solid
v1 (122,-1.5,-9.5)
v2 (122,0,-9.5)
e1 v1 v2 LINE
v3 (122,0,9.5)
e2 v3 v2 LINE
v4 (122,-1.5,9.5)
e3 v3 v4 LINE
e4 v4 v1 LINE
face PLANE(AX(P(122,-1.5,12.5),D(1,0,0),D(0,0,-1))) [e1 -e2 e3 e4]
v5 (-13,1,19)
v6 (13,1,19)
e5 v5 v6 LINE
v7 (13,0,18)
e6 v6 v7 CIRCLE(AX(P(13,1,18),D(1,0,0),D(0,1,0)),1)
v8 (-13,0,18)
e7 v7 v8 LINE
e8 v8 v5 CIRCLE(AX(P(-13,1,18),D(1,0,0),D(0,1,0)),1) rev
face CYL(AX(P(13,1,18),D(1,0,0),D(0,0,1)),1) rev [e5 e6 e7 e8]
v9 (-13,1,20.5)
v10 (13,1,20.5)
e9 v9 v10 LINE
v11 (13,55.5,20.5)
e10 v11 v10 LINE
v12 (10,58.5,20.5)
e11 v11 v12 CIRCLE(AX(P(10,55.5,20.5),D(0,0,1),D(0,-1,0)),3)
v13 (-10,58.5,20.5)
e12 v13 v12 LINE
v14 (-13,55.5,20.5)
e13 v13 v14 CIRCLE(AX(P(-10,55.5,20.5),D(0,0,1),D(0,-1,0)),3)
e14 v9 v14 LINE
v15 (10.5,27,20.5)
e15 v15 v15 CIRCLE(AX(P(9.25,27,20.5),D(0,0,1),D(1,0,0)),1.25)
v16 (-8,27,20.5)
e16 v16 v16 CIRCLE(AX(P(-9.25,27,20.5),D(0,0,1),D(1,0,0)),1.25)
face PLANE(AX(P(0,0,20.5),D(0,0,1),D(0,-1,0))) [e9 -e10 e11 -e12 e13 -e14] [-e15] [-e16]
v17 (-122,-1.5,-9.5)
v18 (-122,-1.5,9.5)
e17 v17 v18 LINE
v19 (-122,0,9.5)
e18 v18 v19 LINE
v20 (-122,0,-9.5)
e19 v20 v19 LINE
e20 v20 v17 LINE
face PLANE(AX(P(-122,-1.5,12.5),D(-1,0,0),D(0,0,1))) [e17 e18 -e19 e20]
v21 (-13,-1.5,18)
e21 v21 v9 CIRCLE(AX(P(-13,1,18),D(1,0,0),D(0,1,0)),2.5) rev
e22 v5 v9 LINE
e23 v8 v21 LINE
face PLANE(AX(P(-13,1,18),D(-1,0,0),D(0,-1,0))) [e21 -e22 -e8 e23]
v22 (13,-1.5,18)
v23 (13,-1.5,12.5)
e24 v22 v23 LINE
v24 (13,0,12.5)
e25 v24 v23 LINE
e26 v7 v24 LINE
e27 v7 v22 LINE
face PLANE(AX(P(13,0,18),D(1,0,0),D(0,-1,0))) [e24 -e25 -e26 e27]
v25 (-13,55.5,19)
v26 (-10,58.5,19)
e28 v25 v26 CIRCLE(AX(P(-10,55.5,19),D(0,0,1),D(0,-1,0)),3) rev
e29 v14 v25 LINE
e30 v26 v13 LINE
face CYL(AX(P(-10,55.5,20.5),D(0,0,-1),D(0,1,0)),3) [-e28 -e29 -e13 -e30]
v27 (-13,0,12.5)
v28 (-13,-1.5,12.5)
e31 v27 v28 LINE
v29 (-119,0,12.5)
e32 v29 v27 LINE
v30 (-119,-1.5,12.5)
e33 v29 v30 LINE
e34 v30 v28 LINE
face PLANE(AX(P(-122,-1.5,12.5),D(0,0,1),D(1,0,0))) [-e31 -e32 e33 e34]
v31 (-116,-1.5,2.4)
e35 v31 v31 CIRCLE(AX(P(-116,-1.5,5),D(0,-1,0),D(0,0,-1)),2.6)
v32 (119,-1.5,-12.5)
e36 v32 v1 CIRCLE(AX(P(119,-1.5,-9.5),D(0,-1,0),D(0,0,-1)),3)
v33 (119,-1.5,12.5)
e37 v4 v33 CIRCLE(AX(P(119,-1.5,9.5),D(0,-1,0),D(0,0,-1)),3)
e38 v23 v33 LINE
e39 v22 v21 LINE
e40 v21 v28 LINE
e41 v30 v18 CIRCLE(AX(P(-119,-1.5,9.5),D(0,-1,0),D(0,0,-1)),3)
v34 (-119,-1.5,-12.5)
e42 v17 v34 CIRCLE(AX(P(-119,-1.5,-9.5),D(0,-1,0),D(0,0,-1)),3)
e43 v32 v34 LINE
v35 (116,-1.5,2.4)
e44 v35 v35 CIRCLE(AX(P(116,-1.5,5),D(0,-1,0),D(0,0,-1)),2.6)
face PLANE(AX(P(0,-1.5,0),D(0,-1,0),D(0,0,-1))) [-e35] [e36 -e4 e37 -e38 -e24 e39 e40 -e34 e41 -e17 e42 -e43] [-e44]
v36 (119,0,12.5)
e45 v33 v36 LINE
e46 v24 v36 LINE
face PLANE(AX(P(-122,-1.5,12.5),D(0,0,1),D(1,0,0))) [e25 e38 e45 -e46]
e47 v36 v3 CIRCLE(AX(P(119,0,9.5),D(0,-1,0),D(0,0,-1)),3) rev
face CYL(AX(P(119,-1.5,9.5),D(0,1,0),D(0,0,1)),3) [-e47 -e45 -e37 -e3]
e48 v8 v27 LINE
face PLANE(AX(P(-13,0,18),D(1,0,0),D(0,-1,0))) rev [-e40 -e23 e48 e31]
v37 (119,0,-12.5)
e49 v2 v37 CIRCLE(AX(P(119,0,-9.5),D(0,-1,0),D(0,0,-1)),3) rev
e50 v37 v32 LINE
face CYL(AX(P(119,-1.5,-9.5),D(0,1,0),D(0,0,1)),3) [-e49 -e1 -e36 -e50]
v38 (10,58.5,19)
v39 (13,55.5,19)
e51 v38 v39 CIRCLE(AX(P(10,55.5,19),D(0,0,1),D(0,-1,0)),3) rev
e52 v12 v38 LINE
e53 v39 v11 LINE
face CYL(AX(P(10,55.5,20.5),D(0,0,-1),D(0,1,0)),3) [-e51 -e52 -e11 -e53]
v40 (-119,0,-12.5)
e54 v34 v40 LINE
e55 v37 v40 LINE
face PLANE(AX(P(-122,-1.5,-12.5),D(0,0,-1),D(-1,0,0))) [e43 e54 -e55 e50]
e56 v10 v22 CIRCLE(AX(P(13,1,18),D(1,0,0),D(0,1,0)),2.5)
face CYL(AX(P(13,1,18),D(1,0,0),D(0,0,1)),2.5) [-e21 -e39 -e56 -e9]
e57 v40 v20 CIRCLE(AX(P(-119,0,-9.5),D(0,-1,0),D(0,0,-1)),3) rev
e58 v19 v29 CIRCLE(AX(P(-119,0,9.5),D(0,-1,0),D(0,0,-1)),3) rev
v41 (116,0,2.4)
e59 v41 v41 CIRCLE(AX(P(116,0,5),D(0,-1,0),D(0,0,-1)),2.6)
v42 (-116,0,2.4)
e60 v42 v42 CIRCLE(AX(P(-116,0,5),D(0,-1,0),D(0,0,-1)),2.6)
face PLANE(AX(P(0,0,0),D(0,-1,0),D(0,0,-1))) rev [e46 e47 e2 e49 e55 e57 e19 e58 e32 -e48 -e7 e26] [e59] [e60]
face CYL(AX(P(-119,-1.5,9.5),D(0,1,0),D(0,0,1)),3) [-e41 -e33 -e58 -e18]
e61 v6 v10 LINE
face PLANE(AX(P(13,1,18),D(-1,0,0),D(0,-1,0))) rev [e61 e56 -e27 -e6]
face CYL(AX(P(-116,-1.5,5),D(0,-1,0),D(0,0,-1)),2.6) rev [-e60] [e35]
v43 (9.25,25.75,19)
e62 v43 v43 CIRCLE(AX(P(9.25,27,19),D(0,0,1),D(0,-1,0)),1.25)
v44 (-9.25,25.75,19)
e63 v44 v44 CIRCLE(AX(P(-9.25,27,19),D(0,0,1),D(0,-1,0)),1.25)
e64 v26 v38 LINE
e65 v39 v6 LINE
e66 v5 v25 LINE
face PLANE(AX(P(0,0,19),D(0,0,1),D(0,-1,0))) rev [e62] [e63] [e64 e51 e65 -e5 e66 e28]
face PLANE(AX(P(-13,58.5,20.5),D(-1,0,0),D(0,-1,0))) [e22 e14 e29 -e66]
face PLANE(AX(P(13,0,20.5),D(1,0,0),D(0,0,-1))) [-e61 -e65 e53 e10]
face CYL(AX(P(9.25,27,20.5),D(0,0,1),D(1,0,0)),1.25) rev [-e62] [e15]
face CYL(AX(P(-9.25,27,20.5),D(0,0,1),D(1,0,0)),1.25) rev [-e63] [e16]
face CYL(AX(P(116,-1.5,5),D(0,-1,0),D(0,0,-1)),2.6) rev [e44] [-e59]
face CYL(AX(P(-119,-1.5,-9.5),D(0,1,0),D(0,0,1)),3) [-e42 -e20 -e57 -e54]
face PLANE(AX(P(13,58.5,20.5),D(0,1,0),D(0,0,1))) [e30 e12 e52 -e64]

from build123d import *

# Parameters (mm, degrees)
SKETCH_2_W              = 244
SKETCH_2_H              = 25
SM_BASE_FLANGE_1_DEPTH  = 1.5
SM_EDGE_FLANGE_1_DEPTH  = 26
HOLE_WIZARD_5_2_5_2_1_D = 5.2
HOLE_WIZARD_M3_1_D      = 2.5
FILLET_1_R              = 3


# Sheet-metal steps are written as plain solids
with BuildPart() as part:
    # Sketch 2 → 基体-法兰1 (new body)
    with BuildSketch(Plane(origin=(0, 0, 0), x_dir=(1, 0, 0), z_dir=(0, 1, 0))):
        Rectangle(SKETCH_2_W, SKETCH_2_H)
    extrude(amount=-SM_BASE_FLANGE_1_DEPTH)

    # 边线-法兰1 section (across the edge) → 边线-法兰1 (add)
    with BuildSketch(Plane(origin=(-13, 0, 20.5), x_dir=(0, 0, -1), z_dir=(1, 0, 0))):
        with BuildLine():
            Line((0, 1), (0, 58.5))
            Line((0, 58.5), (1.5, 58.5))
            Line((1.5, 58.5), (1.5, 1))
            ThreePointArc((1.5, 1), (1.792893219, 0.292893219), (2.5, 0))
            Line((2.5, 0), (8, 0))
            Line((8, 0), (8, -1.5))
            Line((8, -1.5), (2.5, -1.5))
            ThreePointArc((2.5, -1.5), (0.732233047, -0.767766953), (0, 1))
        make_face()
    extrude(amount=SM_EDGE_FLANGE_1_DEPTH)

    # Ø5.2 (5.2) 直径孔1 (through all)
    with Locations(Plane(origin=(0, -1.5, 0), x_dir=(-1, 0, 0), z_dir=(0, -1, 0))):
        with Locations((116, -5), (-116, -5)):
            Hole(HOLE_WIZARD_5_2_5_2_1_D / 2)

    # M3 螺纹孔1 (through all)
    with Locations(Plane.XY.offset(20.5)):
        with Locations((-9.25, 27), (9.25, 27)):
            Hole(HOLE_WIZARD_M3_1_D / 2)

    # 圆角1
    fillet_1_edges = [part.edges().sort_by_distance(p)[0] for p in [
        (122, -0.75, -12.5),
        (122, -0.75, 12.5),
        (13, 58.5, 19.75),
        (-13, 58.5, 19.75),
        (-122, -0.75, 12.5),
        (-122, -0.75, -12.5),
    ]]
    fillet(fillet_1_edges, radius=FILLET_1_R)


solid = part.part
